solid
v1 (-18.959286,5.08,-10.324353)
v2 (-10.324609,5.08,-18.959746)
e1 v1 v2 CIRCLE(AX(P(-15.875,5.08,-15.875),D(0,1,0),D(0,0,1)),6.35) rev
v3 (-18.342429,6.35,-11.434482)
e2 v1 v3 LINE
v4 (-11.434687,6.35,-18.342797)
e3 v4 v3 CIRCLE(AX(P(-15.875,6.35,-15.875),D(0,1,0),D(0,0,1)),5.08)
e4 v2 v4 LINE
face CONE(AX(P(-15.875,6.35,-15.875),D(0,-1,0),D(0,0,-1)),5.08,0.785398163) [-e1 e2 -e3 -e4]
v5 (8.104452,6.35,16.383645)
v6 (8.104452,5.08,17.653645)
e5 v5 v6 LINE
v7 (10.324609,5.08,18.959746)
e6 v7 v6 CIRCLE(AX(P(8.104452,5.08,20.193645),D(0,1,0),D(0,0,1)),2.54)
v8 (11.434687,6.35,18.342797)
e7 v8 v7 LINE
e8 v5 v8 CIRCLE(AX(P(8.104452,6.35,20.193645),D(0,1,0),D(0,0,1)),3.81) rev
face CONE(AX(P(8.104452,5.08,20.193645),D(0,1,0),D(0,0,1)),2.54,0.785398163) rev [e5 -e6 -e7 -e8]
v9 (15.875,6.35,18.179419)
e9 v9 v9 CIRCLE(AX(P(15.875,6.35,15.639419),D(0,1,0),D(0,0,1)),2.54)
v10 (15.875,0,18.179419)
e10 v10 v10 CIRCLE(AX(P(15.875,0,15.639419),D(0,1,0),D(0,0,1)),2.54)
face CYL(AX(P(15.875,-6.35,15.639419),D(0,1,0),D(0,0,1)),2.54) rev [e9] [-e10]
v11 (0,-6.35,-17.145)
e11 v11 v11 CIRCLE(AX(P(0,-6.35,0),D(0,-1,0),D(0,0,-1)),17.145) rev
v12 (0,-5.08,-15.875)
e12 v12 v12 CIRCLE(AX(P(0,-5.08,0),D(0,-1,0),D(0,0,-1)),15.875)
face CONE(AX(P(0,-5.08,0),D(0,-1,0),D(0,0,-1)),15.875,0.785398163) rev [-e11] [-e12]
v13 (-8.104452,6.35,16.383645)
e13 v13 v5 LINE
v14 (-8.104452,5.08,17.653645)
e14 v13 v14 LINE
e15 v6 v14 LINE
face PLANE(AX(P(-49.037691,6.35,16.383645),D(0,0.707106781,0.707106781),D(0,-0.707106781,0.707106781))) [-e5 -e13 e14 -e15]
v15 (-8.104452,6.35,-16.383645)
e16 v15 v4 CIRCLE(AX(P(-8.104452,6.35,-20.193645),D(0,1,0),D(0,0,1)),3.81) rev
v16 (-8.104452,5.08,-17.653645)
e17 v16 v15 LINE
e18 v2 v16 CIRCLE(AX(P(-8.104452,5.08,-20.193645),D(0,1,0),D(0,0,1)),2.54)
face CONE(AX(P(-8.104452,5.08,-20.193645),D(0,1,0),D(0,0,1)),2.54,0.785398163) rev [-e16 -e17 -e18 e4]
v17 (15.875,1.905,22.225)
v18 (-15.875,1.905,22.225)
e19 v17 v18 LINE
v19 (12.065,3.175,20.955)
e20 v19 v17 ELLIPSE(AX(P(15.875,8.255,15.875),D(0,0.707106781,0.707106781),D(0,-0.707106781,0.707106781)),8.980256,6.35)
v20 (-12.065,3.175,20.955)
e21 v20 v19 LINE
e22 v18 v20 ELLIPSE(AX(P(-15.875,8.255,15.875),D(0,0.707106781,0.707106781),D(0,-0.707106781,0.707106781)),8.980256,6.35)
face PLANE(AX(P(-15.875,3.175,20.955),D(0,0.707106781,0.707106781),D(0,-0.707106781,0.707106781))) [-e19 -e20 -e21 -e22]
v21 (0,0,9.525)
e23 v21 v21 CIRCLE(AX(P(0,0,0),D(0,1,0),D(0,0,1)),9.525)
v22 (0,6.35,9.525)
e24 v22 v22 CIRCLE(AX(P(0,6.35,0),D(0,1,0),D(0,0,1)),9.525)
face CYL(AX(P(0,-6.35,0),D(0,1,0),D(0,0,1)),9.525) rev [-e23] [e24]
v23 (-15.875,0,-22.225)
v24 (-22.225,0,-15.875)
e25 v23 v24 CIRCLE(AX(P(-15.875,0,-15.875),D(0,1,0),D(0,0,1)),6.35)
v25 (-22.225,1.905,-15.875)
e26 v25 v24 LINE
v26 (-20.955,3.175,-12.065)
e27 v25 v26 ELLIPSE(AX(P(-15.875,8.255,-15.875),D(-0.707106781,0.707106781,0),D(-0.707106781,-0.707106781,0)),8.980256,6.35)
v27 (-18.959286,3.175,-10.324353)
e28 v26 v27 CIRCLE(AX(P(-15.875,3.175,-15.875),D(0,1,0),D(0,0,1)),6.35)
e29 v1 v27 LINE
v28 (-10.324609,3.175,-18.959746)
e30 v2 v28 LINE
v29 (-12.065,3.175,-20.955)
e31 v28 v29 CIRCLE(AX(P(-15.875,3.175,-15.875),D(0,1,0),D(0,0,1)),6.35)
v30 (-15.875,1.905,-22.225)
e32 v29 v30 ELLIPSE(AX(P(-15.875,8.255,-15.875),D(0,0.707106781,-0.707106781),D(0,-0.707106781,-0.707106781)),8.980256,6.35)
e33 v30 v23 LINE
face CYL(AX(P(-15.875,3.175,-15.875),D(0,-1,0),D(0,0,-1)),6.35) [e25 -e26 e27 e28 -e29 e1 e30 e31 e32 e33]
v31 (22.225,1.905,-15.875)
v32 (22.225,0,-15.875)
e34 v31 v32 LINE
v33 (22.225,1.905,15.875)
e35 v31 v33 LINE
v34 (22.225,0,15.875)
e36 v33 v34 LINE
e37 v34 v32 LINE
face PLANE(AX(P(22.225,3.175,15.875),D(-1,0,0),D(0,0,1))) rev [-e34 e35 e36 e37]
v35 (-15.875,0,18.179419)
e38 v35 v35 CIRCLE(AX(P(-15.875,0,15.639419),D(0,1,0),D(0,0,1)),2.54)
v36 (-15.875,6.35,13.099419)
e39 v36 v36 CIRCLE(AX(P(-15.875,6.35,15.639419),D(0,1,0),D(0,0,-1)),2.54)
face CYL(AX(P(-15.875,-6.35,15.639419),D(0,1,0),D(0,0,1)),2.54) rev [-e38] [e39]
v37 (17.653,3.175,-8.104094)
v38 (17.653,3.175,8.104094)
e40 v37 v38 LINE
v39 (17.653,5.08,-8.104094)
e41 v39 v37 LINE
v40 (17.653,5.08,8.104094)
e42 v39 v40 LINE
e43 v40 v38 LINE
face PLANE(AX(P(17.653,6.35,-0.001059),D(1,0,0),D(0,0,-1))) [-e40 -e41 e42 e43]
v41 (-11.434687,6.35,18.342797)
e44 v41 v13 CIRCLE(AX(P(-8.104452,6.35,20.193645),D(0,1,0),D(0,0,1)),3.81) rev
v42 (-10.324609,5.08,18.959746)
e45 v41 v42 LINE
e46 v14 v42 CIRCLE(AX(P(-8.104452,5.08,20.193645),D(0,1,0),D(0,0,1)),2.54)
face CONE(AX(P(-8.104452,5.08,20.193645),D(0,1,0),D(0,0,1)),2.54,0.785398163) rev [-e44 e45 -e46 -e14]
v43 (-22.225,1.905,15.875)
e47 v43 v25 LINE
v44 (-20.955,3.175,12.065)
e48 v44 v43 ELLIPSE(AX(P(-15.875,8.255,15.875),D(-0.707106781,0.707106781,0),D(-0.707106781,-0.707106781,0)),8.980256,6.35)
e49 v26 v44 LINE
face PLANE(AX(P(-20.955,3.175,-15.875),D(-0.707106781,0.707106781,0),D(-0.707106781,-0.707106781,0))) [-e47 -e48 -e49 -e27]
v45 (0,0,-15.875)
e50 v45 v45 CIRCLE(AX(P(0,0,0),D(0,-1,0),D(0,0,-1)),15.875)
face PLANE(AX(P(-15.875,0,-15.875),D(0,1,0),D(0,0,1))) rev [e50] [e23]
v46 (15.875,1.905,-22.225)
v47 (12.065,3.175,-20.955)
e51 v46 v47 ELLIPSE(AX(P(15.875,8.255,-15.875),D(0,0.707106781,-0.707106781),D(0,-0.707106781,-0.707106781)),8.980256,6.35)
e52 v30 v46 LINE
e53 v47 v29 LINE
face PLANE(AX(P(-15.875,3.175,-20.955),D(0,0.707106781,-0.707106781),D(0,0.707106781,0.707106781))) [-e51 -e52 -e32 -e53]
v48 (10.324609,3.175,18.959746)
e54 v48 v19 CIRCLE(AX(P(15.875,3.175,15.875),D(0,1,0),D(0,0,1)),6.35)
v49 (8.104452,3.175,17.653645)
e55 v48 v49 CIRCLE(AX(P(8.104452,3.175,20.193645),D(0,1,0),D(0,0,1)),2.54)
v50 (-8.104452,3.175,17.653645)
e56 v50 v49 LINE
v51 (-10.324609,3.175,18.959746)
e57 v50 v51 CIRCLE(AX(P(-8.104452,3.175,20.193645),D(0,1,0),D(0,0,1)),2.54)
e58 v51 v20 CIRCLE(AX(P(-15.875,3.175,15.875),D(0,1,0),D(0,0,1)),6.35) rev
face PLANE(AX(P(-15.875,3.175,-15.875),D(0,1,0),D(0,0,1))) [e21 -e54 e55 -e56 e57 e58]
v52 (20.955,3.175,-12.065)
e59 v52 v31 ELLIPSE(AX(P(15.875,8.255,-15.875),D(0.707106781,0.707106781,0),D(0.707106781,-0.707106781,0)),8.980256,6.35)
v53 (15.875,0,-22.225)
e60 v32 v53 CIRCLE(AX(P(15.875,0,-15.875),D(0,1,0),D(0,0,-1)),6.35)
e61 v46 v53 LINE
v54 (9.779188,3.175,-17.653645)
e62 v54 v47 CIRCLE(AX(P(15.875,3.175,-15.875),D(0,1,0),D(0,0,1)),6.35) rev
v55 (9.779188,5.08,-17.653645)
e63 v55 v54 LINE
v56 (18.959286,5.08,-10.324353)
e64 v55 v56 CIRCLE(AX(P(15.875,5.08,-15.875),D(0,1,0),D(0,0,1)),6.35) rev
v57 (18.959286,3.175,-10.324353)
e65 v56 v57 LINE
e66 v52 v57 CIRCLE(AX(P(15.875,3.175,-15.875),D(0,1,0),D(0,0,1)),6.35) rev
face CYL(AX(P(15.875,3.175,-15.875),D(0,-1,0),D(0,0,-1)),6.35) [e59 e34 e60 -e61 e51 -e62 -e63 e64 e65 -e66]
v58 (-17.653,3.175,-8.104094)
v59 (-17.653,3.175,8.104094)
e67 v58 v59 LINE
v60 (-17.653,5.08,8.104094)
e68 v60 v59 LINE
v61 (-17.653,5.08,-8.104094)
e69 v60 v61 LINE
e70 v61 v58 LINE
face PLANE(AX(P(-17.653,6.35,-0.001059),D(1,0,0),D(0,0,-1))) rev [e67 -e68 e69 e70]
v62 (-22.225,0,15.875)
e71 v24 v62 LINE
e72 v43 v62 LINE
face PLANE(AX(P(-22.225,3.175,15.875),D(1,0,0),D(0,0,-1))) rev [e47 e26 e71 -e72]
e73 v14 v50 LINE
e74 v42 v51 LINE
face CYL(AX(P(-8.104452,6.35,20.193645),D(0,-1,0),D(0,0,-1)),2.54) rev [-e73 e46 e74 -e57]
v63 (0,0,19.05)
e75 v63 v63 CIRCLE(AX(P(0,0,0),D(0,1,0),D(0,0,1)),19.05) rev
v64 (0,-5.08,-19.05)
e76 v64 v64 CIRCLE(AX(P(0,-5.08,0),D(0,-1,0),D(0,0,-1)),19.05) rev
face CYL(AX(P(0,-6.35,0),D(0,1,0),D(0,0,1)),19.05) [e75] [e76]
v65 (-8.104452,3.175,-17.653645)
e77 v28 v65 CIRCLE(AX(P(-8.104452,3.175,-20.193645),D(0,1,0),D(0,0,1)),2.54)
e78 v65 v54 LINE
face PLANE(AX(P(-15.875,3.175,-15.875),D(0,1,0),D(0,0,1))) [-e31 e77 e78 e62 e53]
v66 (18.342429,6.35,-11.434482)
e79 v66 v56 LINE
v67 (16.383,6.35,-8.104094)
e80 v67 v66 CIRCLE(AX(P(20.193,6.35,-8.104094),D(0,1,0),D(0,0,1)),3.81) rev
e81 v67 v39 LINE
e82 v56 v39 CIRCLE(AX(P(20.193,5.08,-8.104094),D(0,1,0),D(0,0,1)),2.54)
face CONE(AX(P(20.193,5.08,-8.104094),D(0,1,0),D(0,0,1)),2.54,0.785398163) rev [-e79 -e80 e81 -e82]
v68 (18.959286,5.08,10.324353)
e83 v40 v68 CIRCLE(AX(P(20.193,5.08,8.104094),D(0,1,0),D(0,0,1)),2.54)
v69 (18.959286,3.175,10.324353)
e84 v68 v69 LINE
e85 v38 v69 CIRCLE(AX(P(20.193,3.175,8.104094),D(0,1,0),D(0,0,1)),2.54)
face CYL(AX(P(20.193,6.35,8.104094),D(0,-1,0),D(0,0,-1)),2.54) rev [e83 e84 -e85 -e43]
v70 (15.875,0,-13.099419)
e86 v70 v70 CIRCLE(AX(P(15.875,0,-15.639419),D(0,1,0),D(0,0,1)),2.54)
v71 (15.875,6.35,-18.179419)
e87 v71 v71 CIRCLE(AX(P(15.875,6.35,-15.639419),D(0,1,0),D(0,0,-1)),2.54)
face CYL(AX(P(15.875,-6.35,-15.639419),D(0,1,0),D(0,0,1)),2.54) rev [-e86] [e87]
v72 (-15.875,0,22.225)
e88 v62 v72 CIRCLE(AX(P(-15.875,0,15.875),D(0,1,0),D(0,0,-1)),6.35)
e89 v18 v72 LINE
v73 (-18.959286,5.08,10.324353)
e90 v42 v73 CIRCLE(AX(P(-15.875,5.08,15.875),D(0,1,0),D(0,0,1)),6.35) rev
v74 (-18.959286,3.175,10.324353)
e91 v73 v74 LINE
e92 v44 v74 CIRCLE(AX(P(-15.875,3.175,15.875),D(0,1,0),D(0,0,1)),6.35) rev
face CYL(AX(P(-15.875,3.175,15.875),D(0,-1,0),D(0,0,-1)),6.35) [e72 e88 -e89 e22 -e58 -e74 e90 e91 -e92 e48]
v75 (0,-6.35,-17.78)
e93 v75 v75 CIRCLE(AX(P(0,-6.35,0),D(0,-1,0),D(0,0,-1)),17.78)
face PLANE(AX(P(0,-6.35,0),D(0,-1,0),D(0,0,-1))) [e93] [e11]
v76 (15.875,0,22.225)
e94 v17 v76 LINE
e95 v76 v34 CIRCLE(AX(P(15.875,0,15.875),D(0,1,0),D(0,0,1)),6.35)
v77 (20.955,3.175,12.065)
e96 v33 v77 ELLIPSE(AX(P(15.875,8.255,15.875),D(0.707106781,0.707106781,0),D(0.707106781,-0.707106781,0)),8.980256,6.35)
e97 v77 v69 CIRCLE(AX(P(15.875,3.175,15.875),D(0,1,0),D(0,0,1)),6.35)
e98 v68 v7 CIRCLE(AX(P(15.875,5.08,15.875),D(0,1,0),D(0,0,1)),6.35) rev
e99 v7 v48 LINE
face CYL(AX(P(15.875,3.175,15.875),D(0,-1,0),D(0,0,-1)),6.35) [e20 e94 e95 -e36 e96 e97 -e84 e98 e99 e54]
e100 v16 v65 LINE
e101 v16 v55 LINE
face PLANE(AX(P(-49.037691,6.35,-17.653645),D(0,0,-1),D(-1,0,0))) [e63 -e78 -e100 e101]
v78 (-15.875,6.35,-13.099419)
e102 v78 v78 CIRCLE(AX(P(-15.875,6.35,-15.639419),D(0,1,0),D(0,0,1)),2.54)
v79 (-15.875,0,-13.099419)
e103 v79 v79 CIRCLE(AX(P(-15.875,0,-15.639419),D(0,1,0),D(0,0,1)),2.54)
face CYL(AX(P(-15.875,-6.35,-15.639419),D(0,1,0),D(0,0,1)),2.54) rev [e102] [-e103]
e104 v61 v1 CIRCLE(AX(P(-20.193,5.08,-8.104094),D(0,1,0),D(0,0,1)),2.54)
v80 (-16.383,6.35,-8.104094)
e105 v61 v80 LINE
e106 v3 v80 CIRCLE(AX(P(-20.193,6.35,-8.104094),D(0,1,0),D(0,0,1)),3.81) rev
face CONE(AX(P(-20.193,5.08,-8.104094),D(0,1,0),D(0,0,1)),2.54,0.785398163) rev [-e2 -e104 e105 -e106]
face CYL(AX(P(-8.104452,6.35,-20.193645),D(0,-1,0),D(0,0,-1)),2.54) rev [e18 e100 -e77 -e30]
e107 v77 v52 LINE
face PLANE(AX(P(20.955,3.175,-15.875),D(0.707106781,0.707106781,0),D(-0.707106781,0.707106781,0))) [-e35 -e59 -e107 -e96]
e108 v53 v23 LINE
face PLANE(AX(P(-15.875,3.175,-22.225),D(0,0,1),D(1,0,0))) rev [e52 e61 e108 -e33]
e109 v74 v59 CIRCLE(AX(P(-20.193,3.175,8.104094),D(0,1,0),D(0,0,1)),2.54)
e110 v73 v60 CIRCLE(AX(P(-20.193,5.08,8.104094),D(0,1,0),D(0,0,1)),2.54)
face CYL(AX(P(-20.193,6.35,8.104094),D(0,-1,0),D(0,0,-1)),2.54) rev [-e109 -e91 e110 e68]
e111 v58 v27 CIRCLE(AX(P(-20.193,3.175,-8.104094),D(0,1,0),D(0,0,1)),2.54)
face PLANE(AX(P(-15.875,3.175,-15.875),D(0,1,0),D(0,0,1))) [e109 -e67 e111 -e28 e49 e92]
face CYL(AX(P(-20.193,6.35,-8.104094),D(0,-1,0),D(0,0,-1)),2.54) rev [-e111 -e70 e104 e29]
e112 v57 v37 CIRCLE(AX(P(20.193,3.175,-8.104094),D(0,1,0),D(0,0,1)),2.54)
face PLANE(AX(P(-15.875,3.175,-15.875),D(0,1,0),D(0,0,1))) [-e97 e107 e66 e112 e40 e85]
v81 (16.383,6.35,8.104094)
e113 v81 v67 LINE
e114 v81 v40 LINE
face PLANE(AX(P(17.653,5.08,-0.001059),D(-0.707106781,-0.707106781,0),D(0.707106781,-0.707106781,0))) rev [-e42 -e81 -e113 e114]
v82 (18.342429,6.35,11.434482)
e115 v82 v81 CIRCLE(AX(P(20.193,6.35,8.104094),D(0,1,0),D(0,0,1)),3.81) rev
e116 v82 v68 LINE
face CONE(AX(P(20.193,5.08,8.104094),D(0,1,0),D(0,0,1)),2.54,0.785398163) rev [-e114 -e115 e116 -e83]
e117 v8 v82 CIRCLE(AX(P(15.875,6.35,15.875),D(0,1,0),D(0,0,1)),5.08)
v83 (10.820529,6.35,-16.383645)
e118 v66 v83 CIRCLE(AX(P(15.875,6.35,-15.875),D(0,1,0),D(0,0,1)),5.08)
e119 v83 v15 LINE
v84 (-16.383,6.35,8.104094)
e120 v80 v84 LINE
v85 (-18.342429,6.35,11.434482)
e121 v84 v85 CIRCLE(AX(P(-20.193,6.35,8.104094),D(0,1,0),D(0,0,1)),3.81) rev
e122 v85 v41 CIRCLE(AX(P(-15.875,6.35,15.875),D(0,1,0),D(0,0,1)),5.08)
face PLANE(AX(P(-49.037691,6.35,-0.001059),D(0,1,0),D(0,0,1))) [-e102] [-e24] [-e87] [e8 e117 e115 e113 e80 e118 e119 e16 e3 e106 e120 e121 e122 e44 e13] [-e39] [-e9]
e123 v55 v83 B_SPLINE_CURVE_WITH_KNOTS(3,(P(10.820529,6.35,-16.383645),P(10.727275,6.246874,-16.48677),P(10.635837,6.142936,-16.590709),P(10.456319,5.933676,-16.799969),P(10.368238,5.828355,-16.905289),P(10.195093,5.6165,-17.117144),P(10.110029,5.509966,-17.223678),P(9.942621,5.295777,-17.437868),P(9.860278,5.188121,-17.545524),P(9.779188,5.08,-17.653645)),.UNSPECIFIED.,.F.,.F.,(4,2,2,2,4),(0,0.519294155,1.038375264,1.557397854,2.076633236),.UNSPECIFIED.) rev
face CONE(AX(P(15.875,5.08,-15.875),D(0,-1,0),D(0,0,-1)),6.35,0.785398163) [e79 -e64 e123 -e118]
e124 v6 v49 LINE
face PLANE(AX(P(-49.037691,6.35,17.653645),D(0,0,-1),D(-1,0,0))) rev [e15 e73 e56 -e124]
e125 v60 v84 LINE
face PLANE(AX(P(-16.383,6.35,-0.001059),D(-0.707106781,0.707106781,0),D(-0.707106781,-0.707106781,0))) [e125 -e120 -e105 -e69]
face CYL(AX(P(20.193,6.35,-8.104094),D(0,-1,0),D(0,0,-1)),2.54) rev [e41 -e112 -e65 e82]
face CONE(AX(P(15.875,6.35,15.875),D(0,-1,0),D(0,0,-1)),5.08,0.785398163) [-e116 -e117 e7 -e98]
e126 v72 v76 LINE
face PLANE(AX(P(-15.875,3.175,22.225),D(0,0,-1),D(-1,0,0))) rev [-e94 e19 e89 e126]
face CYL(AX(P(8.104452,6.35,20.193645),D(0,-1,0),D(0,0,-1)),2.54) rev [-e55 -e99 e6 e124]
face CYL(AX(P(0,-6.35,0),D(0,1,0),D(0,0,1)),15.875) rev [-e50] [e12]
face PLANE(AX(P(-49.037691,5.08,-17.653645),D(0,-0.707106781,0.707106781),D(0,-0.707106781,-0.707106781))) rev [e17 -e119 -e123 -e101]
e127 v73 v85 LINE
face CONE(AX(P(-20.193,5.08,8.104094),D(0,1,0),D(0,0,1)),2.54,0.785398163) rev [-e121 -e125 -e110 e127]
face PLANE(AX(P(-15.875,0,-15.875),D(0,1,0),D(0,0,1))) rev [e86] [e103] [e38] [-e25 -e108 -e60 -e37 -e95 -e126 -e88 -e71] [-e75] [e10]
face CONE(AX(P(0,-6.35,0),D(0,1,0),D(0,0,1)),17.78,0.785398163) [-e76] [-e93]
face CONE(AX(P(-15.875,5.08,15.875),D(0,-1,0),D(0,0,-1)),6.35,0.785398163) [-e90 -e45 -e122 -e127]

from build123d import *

# Parameters (mm, degrees)
BOSS_EXTRUDE1_DEPTH = 3.175
BOSS_EXTRUDE2_DEPTH = 3.175
SKETCH3_R           = 19.05
SKETCH3_R_2         = 15.875
BOSS_EXTRUDE3_DEPTH = 6.35
SKETCH4_R           = 2.54
CUT_EXTRUDE1_DEPTH  = 34.89972345
CHAMFER1_SIZE       = 1.27
SKETCH5_R           = 9.525
CUT_EXTRUDE2_DEPTH  = 34.89972345


with BuildPart() as part:
    # Sketch1 → Boss-Extrude1 (new body)
    with BuildSketch(Plane(origin=(0, 0, 0), x_dir=(1, 0, 0), z_dir=(0, 1, 0))):
        with BuildLine():
            Line((-15.875, -22.225), (15.875, -22.225))
            ThreePointArc((15.875, -22.225), (20.365128061, -20.365128061), (22.225, -15.875))
            Line((22.225, -15.875), (22.225, 15.875))
            ThreePointArc((22.225, 15.875), (20.365128061, 20.365128061), (15.875, 22.225))
            Line((15.875, 22.225), (-15.875, 22.225))
            ThreePointArc((-15.875, 22.225), (-20.365128061, 20.365128061), (-22.225, 15.875))
            Line((-22.225, 15.875), (-22.225, -15.875))
            ThreePointArc((-22.225, -15.875), (-20.365128061, -20.365128061), (-15.875, -22.225))
        make_face()
    extrude(amount=BOSS_EXTRUDE1_DEPTH)

    # Sketch2 → Boss-Extrude2 (add)
    with BuildSketch(Plane(origin=(0, 3.175, 0), x_dir=(1, 0, 0), z_dir=(0, 1, 0))):
        with BuildLine():
            Line((9.779188038, 17.653644576), (-8.104452463, 17.653644576))
            ThreePointArc((-8.104452463, 17.653644576), (-9.392376749, 18.004386475), (-10.324608902, 18.959746126))
            ThreePointArc((-10.324608902, 18.959746126), (-12.655189283, 21.348145252), (-15.875, 22.225))
            ThreePointArc((-15.875, 22.225), (-20.365128061, 20.365128061), (-22.225, 15.875))
            ThreePointArc((-22.225, 15.875), (-21.348011707, 12.654962289), (-18.959285714, 10.324353044))
            ThreePointArc((-18.959285714, 10.324353044), (-18.003795317, 9.392109345), (-17.653, 8.104094261))
            Line((-17.653, 8.104094261), (-17.653, -8.104094261))
            ThreePointArc((-17.653, -8.104094261), (-18.003795317, -9.392109345), (-18.959285714, -10.324353044))
            ThreePointArc((-18.959285714, -10.324353044), (-21.348011707, -12.654962289), (-22.225, -15.875))
            ThreePointArc((-22.225, -15.875), (-20.365128061, -20.365128061), (-15.875, -22.225))
            ThreePointArc((-15.875, -22.225), (-12.655189283, -21.348145252), (-10.324608902, -18.959746126))
            ThreePointArc((-10.324608902, -18.959746126), (-9.392376749, -18.004386475), (-8.104452463, -17.653644576))
            Line((-8.104452463, -17.653644576), (8.104452463, -17.653644576))
            ThreePointArc((8.104452463, -17.653644576), (9.392376749, -18.004386475), (10.324608902, -18.959746126))
            ThreePointArc((10.324608902, -18.959746126), (12.655189283, -21.348145252), (15.875, -22.225))
            ThreePointArc((15.875, -22.225), (20.365128061, -20.365128061), (22.225, -15.875))
            ThreePointArc((22.225, -15.875), (21.348011707, -12.654962289), (18.959285714, -10.324353044))
            ThreePointArc((18.959285714, -10.324353044), (18.003795317, -9.392109345), (17.653, -8.104094261))
            Line((17.653, -8.104094261), (17.653, 8.104094261))
            ThreePointArc((17.653, 8.104094261), (18.003795317, 9.392109345), (18.959285714, 10.324353044))
            ThreePointArc((18.959285714, 10.324353044), (21.348011707, 12.654962289), (22.225, 15.875))
            ThreePointArc((22.225, 15.875), (20.365128061, 20.365128061), (15.875, 22.225))
            ThreePointArc((15.875, 22.225), (12.065268583, 20.955201426), (9.779188038, 17.653644576))
        make_face()
    extrude(amount=BOSS_EXTRUDE2_DEPTH)

    # Sketch3 → Boss-Extrude3 (add)
    with BuildSketch(Plane.XZ):
        with Locations(Location((0, 0, 0), (0, 0, 90))):
            Circle(SKETCH3_R)
        with Locations(Location((0, 0, 0), (0, 0, 270))):
            Circle(SKETCH3_R_2, mode=Mode.SUBTRACT)
    extrude(amount=BOSS_EXTRUDE3_DEPTH)

    # Sketch4 → Cut-Extrude1 (cut, through all)
    with BuildSketch(Plane(origin=(0, 6.35, 0), x_dir=(1, 0, 0), z_dir=(0, 1, 0))):
        with Locations(Location((-15.875, 15.639418556, 0), (0, 0, 270))):
            Circle(SKETCH4_R)
        with Locations(Location((15.875, 15.639418556, 0), (0, 0, 270))):
            Circle(SKETCH4_R)
        with Locations(Location((-15.875, -15.639418556, 0), (0, 0, 270))):
            Circle(SKETCH4_R)
        with Locations(Location((15.875, -15.639418556, 0), (0, 0, 270))):
            Circle(SKETCH4_R)
    extrude(amount=-CUT_EXTRUDE1_DEPTH, mode=Mode.SUBTRACT)

    # Chamfer1
    chamfer1_edges = [part.edges().sort_by_distance(p)[0] for p in [
        (-20.365314283, 6.35, -20.36494183),
        (-20.365314283, 6.35, 20.36494183),
        (-9.392376749, 6.35, -18.004386475),
        (19.836937806, 6.35, -20.837413609),
        (0.837367788, 6.35, -17.653644576),
        (18.003795317, 6.35, -9.392109345),
        (17.653, 6.35, 0),
        (18.003795317, 6.35, 9.392109345),
        (-18.003795317, 6.35, -9.392109345),
        (20.365314283, 6.35, 20.36494183),
        (-17.653, 6.35, 0),
        (9.392376749, 6.35, 18.004386475),
        (-18.003795317, 6.35, 9.392109345),
        (0, 6.35, 17.653644576),
        (-9.392376749, 6.35, 18.004386475),
    ]]
    chamfer(chamfer1_edges, length=CHAMFER1_SIZE)
    chamfer1_2_edges = [part.edges().sort_by_distance(p)[0] for p in [
        (0, -6.35, -19.05),
    ]]
    chamfer(chamfer1_2_edges, length=CHAMFER1_SIZE)
    chamfer1_3_edges = [part.edges().sort_by_distance(p)[0] for p in [
        (0, -6.35, 15.875),
    ]]
    chamfer(chamfer1_3_edges, length=CHAMFER1_SIZE)
    # the kernel refuses this chamfer: 1.27 mm, written as the material it takes off along each edge
    with BuildSketch(Plane(origin=(-22.225, 3.175, -19.141037395), x_dir=(-0.02749587661058728, -0.9996219169112966, 0), z_dir=(0, 0, 1))) as chamfer1_4_piece_1_section:
        with BuildLine():
            Line((1.306414958, 0), (-0.071814887, 1.304439598))
            Line((-0.071814887, 1.304439598), (-0.097205283, 1.303741203))
            ThreePointArc((-0.097205283, 1.303741203), (-0.043344118, 0.652015244), (-0.025390397, -0.000698395))
            Line((-0.025390397, -0.000698395), (0.000698395, -0.025390397))
            ThreePointArc((0.000698395, -0.025390397), (0.653412034, -0.007436675), (1.307113353, -0.025390397))
            Line((1.307113353, -0.025390397), (1.306414958, 0))
        make_face()
    chamfer1_4_piece_1 = extrude(amount=38.282074789, mode=Mode.PRIVATE)
    chamfer1_4_piece_1 = chamfer1_4_piece_1 - Plane(origin=(-15.875, 2.735416382, -15.875), x_dir=(0, 0, -1), z_dir=(0, -1, 0)) * Cylinder(6.35, 82, mode=Mode.PRIVATE)
    chamfer1_4_piece_1 = chamfer1_4_piece_1 - Plane(origin=(-15.875, 2.735416382, 15.875), x_dir=(-1, 0, 0), z_dir=(0, -1, 0)) * Cylinder(6.35, 82, mode=Mode.PRIVATE)
    add(chamfer1_4_piece_1, mode=Mode.SUBTRACT)
    # the kernel refuses this chamfer: 1.27 mm, written as the material it takes off along each edge
    with BuildSketch(Plane(origin=(19.141037395, 3.175, -22.225), x_dir=(0, -0.9996219169112966, -0.02749587661058728), z_dir=(-1, 0, 0))) as chamfer1_5_piece_1_section:
        with BuildLine():
            Line((1.306414958, 0), (-0.071814887, 1.304439598))
            Line((-0.071814887, 1.304439598), (-0.097205283, 1.303741203))
            ThreePointArc((-0.097205283, 1.303741203), (-0.043344118, 0.652015244), (-0.025390397, -0.000698395))
            Line((-0.025390397, -0.000698395), (0.000698395, -0.025390397))
            ThreePointArc((0.000698395, -0.025390397), (0.653412034, -0.007436675), (1.307113353, -0.025390397))
            Line((1.307113353, -0.025390397), (1.306414958, 0))
        make_face()
    chamfer1_5_piece_1 = extrude(amount=38.282074789, mode=Mode.PRIVATE)
    chamfer1_5_piece_1 = chamfer1_5_piece_1 - Plane(origin=(-15.875, 2.735416382, -15.875), x_dir=(0, 0, -1), z_dir=(0, -1, 0)) * Cylinder(6.35, 82, mode=Mode.PRIVATE)
    chamfer1_5_piece_1 = chamfer1_5_piece_1 - Plane(origin=(15.875, 2.735416382, -15.875), x_dir=(1, 0, 0), z_dir=(0, -1, 0)) * Cylinder(6.35, 82, mode=Mode.PRIVATE)
    add(chamfer1_5_piece_1, mode=Mode.SUBTRACT)
    # the kernel refuses this chamfer: 1.27 mm, written as the material it takes off along each edge
    with BuildSketch(Plane(origin=(-19.141037395, 3.175, 22.225), x_dir=(0, -0.9996219169112966, 0.02749587661058728), z_dir=(1, 0, 0))) as chamfer1_6_piece_1_section:
        with BuildLine():
            Line((1.306414958, 0), (-0.071814887, 1.304439598))
            Line((-0.071814887, 1.304439598), (-0.097205283, 1.303741203))
            ThreePointArc((-0.097205283, 1.303741203), (-0.043344118, 0.652015244), (-0.025390397, -0.000698395))
            Line((-0.025390397, -0.000698395), (0.000698395, -0.025390397))
            ThreePointArc((0.000698395, -0.025390397), (0.653412034, -0.007436675), (1.307113353, -0.025390397))
            Line((1.307113353, -0.025390397), (1.306414958, 0))
        make_face()
    chamfer1_6_piece_1 = extrude(amount=38.282074789, mode=Mode.PRIVATE)
    chamfer1_6_piece_1 = chamfer1_6_piece_1 - Plane(origin=(-15.875, 2.735416383, 15.875), x_dir=(-1, 0, 0), z_dir=(0, -1, 0)) * Cylinder(6.35, 82, mode=Mode.PRIVATE)
    chamfer1_6_piece_1 = chamfer1_6_piece_1 - Plane(origin=(15.875, 2.735416383, 15.875), x_dir=(0, 0, 1), z_dir=(0, -1, 0)) * Cylinder(6.35, 82, mode=Mode.PRIVATE)
    add(chamfer1_6_piece_1, mode=Mode.SUBTRACT)
    # the kernel refuses this chamfer: 1.27 mm, written as the material it takes off along each edge
    with BuildSketch(Plane(origin=(22.225, 3.175, 19.141037395), x_dir=(0.02749587661058728, -0.9996219169112966, 0), z_dir=(0, 0, -1))) as chamfer1_7_piece_1_section:
        with BuildLine():
            Line((1.306414958, 0), (-0.071814887, 1.304439598))
            Line((-0.071814887, 1.304439598), (-0.097205283, 1.303741203))
            ThreePointArc((-0.097205283, 1.303741203), (-0.043344118, 0.652015244), (-0.025390397, -0.000698395))
            Line((-0.025390397, -0.000698395), (0.000698395, -0.025390397))
            ThreePointArc((0.000698395, -0.025390397), (0.653412034, -0.007436675), (1.307113353, -0.025390397))
            Line((1.307113353, -0.025390397), (1.306414958, 0))
        make_face()
    chamfer1_7_piece_1 = extrude(amount=38.282074789, mode=Mode.PRIVATE)
    chamfer1_7_piece_1 = chamfer1_7_piece_1 - Plane(origin=(15.875, 2.735416383, -15.875), x_dir=(1, 0, 0), z_dir=(0, -1, 0)) * Cylinder(6.35, 82, mode=Mode.PRIVATE)
    chamfer1_7_piece_1 = chamfer1_7_piece_1 - Plane(origin=(15.875, 2.735416383, 15.875), x_dir=(0, 0, 1), z_dir=(0, -1, 0)) * Cylinder(6.35, 82, mode=Mode.PRIVATE)
    add(chamfer1_7_piece_1, mode=Mode.SUBTRACT)

    # Sketch5 → Cut-Extrude2 (cut, through all)
    with BuildSketch(Plane(origin=(0, 6.35, 0), x_dir=(1, 0, 0), z_dir=(0, 1, 0))):
        with Locations(Location((0, 0, 0), (0, 0, 270))):
            Circle(SKETCH5_R)
    extrude(amount=-CUT_EXTRUDE2_DEPTH, mode=Mode.SUBTRACT)


solid = part.part
